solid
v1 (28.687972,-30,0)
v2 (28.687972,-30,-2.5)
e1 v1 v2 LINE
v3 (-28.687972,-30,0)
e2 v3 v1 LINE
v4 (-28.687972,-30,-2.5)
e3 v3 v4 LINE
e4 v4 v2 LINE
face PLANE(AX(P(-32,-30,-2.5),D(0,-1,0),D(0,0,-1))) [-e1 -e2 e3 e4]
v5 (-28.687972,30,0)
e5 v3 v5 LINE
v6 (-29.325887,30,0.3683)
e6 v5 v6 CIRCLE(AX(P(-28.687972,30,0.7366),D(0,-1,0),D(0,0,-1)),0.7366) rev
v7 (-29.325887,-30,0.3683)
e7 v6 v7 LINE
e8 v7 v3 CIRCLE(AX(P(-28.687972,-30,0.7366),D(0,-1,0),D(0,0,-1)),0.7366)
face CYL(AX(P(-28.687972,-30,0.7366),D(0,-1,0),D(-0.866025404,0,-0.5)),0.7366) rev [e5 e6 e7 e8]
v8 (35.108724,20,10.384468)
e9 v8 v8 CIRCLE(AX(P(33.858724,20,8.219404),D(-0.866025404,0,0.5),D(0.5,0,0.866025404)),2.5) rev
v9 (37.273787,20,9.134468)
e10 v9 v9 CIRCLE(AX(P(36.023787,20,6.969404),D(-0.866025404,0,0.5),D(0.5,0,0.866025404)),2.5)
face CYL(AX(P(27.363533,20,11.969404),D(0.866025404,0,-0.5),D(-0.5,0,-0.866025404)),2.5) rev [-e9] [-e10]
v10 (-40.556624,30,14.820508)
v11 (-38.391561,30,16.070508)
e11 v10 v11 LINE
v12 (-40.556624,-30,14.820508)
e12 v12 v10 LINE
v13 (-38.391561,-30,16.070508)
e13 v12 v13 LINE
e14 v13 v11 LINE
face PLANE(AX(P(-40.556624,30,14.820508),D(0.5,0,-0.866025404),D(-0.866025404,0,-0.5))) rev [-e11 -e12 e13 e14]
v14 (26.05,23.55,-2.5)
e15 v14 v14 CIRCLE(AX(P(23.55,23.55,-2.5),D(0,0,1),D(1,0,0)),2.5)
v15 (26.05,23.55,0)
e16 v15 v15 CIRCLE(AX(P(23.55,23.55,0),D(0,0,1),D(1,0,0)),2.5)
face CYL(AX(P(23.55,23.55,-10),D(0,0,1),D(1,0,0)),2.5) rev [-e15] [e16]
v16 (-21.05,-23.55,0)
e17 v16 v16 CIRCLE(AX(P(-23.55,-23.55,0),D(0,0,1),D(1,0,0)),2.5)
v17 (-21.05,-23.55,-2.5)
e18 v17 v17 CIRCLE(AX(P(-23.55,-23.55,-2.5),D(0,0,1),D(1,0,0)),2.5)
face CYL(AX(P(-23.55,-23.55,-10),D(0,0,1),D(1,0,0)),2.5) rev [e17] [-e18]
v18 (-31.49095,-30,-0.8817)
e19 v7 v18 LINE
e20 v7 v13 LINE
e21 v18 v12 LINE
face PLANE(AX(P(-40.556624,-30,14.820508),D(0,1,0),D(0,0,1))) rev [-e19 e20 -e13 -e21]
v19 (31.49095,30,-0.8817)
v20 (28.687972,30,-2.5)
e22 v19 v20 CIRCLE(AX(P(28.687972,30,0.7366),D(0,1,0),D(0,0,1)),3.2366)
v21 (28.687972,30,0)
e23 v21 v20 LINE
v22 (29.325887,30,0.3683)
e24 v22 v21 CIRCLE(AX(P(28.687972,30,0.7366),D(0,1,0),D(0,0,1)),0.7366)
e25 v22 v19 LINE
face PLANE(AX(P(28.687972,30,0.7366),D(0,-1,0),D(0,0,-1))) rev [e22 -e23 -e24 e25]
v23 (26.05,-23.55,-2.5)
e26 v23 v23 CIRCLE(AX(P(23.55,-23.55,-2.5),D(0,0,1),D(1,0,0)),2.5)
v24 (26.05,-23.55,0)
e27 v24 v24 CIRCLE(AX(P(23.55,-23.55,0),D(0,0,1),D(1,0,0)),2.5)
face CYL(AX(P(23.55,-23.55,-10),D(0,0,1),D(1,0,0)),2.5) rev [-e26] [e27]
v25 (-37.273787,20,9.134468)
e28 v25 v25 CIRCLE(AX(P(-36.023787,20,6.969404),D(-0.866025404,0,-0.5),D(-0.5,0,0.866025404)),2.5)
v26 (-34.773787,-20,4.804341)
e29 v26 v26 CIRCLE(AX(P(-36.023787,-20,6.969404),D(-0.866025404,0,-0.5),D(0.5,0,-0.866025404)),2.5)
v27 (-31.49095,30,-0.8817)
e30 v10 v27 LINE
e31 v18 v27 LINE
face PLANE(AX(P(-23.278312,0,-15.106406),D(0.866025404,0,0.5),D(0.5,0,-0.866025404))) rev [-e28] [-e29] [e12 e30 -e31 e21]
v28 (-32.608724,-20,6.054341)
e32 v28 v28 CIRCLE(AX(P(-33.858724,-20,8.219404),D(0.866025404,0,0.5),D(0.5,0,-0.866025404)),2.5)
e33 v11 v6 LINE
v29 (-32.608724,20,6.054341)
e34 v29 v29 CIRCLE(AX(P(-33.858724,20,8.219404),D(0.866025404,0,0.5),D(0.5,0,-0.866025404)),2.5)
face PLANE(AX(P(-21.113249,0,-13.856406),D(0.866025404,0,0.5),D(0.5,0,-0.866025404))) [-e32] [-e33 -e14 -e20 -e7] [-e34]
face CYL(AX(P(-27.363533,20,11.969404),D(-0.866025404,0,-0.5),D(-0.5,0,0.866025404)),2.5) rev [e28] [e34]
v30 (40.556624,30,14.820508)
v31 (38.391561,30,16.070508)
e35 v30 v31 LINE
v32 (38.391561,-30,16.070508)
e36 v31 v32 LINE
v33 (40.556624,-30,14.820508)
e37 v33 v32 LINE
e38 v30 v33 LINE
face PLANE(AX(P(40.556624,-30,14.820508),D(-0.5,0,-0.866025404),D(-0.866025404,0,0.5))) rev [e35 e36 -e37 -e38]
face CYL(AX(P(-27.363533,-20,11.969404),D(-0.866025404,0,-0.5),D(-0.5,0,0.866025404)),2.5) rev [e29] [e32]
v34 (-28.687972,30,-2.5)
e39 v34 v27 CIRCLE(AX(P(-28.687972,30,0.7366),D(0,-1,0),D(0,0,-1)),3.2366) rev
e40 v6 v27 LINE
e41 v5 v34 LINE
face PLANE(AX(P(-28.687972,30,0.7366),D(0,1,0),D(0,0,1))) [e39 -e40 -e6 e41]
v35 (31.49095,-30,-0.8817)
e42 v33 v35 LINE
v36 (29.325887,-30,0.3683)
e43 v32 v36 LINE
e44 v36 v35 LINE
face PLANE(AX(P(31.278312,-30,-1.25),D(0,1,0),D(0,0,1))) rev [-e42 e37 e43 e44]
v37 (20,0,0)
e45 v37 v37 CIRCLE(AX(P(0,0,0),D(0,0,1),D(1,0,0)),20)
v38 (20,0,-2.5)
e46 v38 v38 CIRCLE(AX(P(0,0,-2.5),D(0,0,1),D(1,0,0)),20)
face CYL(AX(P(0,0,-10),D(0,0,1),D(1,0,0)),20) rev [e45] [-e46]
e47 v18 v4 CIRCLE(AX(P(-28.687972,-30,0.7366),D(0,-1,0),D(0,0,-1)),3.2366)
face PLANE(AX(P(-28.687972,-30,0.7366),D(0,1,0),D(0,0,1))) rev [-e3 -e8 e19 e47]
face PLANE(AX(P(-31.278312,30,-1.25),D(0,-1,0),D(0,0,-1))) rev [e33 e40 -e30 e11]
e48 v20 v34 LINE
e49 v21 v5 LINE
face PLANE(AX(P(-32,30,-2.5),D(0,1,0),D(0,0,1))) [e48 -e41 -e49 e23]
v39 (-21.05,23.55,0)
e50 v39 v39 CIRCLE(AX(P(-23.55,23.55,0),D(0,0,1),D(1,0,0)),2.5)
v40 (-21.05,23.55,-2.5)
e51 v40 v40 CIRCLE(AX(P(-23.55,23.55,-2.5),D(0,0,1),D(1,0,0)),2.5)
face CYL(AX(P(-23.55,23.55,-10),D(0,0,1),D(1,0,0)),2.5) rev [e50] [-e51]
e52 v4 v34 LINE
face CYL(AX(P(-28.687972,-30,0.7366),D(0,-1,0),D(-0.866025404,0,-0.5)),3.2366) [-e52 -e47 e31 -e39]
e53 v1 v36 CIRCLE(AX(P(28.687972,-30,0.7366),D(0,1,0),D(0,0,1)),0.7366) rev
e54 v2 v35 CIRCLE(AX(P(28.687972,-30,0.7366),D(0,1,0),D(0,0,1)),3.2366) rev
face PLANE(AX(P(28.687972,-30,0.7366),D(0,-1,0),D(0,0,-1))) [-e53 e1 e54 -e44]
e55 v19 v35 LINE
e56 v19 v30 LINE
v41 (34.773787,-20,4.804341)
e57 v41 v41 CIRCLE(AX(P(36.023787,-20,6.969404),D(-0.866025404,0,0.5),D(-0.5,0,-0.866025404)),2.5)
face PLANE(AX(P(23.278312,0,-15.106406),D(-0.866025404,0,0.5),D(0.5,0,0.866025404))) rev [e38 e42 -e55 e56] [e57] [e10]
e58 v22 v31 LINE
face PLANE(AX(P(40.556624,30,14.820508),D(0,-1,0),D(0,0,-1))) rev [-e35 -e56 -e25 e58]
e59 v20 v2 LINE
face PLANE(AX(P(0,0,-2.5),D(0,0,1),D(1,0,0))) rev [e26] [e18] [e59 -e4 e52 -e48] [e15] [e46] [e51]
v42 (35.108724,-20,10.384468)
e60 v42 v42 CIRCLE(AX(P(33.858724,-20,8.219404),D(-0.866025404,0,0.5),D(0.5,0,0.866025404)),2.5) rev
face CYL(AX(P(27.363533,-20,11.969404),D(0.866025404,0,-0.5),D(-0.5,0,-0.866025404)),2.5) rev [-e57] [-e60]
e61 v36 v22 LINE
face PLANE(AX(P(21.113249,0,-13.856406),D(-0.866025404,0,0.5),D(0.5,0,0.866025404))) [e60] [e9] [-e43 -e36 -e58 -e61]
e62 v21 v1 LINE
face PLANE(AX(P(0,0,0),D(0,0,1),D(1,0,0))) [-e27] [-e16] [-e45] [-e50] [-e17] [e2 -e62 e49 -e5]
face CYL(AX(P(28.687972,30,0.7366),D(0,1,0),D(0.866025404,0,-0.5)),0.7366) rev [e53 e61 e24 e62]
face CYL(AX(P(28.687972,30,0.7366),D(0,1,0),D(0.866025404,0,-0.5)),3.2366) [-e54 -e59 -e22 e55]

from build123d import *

# Parameters (mm, degrees)
SCHIZZO1_W               = 64
SCHIZZO1_H               = 60
BASE_FLANGIA1_DEPTH      = 2.5
BORDO_FLANGIA1_START     = -30
BORDO_FLANGIA1_DEPTH     = 60
BORDO_FLANGIA1_2_DEPTH   = 60
BORDO_FLANGIA2_START     = -30
BORDO_FLANGIA2_DEPTH     = 60
BORDO_FLANGIA2_2_DEPTH   = 60
SCHIZZO12_R              = 2.5
SCHIZZO12_R_2            = 20
TAGLIO_ESTRUSIONE1_DEPTH = 10
SCHIZZO14_R              = 2.5
TAGLIO_ESTRUSIONE2_DEPTH = 10


# Read off the part's stored shape, not the designer's step: Bordo-Flangia1, Bordo-Flangia2
# Sheet-metal steps are written as plain solids
with BuildPart() as part:
    # Schizzo1 → Base-Flangia1 (new body)
    with BuildSketch(Plane.XY):
        Rectangle(SCHIZZO1_W, SCHIZZO1_H)
    extrude(amount=-BASE_FLANGIA1_DEPTH)

    # Bordo-Flangia1 outline → Bordo-Flangia1 (cut)
    with BuildSketch(Plane(origin=(0, 0, 0), x_dir=(1, 0, 0), z_dir=(0, 1, 0)).offset(BORDO_FLANGIA1_START)):
        with BuildLine():
            ThreePointArc((28.687972446, 2.5), (30.306272446, 2.066377822), (31.490950268, 0.8817))
            Line((31.490950268, 0.8817), (32, 0))
            Line((32, 0), (32, 2.5))
            Line((32, 2.5), (28.687972446, 2.5))
        make_face()
    extrude(amount=BORDO_FLANGIA1_DEPTH, mode=Mode.SUBTRACT)

    # Bordo-Flangia1 2 outline → Bordo-Flangia1 2 (add)
    with BuildSketch(Plane(origin=(0, 0, 0), x_dir=(1, 0, 0), z_dir=(0, 1, 0)).offset(BORDO_FLANGIA1_START)):
        with BuildLine():
            Line((40.556624327, -14.820508076), (32, 0))
            Line((32, 0), (28.687972446, 0))
            ThreePointArc((28.687972446, 0), (29.056272446, -0.098685688), (29.325886758, -0.3683))
            Line((29.325886758, -0.3683), (38.391560818, -16.070508076))
            Line((38.391560818, -16.070508076), (40.556624327, -14.820508076))
        make_face()
    extrude(amount=BORDO_FLANGIA1_2_DEPTH)

    # Bordo-Flangia2 outline → Bordo-Flangia2 (cut)
    with BuildSketch(Plane(origin=(0, 0, 0), x_dir=(1, 0, 0), z_dir=(0, 1, 0)).offset(BORDO_FLANGIA2_START)):
        with BuildLine():
            Line((-32, 0), (-31.490950268, 0.8817))
            ThreePointArc((-31.490950268, 0.8817), (-30.306272446, 2.066377822), (-28.687972446, 2.5))
            Line((-28.687972446, 2.5), (-32, 2.5))
            Line((-32, 2.5), (-32, 0))
        make_face()
    extrude(amount=BORDO_FLANGIA2_DEPTH, mode=Mode.SUBTRACT)

    # Bordo-Flangia2 2 outline → Bordo-Flangia2 2 (add)
    with BuildSketch(Plane(origin=(0, 0, 0), x_dir=(1, 0, 0), z_dir=(0, 1, 0)).offset(BORDO_FLANGIA2_START)):
        with BuildLine():
            Line((-28.687972446, 0), (-32, 0))
            Line((-32, 0), (-40.556624327, -14.820508076))
            Line((-40.556624327, -14.820508076), (-38.391560818, -16.070508076))
            Line((-38.391560818, -16.070508076), (-29.325886758, -0.3683))
            ThreePointArc((-29.325886758, -0.3683), (-29.056272446, -0.098685688), (-28.687972446, 0))
        make_face()
    extrude(amount=BORDO_FLANGIA2_2_DEPTH)

    # Schizzo12 → Taglio-Estrusione1 (cut)
    with BuildSketch(Plane.XY):
        with Locations((-23.55, 23.55)):
            Circle(SCHIZZO12_R)
        with Locations((23.55, 23.55)):
            Circle(SCHIZZO12_R)
        with Locations((23.55, -23.55)):
            Circle(SCHIZZO12_R)
        with Locations((-23.55, -23.55)):
            Circle(SCHIZZO12_R)
        Circle(SCHIZZO12_R_2)
    extrude(amount=-TAGLIO_ESTRUSIONE1_DEPTH, mode=Mode.SUBTRACT)

    # Schizzo14 → Taglio-Estrusione2 (cut)
    with BuildSketch(Plane(origin=(-24, 0, -13.856406461), x_dir=(-0.5000000000000043, 0, 0.8660254037844363), z_dir=(-0.8660254037844362, 0, -0.5000000000000042))):
        with Locations((24.047574595, 20)):
            Circle(SCHIZZO14_R)
        with Locations(Location((24.047574595, -20, 0), (0, 0, 180))):
            Circle(SCHIZZO14_R)
    taglio_estrusione2 = extrude(amount=-TAGLIO_ESTRUSIONE2_DEPTH, mode=Mode.SUBTRACT)

    # Specchia1: Taglio-Estrusione2 across plane
    add(taglio_estrusione2.mirror(Plane(origin=(0, 0, 0), x_dir=(0, 0, 1), z_dir=(1, 0, 0))), mode=Mode.SUBTRACT)


solid = part.part
